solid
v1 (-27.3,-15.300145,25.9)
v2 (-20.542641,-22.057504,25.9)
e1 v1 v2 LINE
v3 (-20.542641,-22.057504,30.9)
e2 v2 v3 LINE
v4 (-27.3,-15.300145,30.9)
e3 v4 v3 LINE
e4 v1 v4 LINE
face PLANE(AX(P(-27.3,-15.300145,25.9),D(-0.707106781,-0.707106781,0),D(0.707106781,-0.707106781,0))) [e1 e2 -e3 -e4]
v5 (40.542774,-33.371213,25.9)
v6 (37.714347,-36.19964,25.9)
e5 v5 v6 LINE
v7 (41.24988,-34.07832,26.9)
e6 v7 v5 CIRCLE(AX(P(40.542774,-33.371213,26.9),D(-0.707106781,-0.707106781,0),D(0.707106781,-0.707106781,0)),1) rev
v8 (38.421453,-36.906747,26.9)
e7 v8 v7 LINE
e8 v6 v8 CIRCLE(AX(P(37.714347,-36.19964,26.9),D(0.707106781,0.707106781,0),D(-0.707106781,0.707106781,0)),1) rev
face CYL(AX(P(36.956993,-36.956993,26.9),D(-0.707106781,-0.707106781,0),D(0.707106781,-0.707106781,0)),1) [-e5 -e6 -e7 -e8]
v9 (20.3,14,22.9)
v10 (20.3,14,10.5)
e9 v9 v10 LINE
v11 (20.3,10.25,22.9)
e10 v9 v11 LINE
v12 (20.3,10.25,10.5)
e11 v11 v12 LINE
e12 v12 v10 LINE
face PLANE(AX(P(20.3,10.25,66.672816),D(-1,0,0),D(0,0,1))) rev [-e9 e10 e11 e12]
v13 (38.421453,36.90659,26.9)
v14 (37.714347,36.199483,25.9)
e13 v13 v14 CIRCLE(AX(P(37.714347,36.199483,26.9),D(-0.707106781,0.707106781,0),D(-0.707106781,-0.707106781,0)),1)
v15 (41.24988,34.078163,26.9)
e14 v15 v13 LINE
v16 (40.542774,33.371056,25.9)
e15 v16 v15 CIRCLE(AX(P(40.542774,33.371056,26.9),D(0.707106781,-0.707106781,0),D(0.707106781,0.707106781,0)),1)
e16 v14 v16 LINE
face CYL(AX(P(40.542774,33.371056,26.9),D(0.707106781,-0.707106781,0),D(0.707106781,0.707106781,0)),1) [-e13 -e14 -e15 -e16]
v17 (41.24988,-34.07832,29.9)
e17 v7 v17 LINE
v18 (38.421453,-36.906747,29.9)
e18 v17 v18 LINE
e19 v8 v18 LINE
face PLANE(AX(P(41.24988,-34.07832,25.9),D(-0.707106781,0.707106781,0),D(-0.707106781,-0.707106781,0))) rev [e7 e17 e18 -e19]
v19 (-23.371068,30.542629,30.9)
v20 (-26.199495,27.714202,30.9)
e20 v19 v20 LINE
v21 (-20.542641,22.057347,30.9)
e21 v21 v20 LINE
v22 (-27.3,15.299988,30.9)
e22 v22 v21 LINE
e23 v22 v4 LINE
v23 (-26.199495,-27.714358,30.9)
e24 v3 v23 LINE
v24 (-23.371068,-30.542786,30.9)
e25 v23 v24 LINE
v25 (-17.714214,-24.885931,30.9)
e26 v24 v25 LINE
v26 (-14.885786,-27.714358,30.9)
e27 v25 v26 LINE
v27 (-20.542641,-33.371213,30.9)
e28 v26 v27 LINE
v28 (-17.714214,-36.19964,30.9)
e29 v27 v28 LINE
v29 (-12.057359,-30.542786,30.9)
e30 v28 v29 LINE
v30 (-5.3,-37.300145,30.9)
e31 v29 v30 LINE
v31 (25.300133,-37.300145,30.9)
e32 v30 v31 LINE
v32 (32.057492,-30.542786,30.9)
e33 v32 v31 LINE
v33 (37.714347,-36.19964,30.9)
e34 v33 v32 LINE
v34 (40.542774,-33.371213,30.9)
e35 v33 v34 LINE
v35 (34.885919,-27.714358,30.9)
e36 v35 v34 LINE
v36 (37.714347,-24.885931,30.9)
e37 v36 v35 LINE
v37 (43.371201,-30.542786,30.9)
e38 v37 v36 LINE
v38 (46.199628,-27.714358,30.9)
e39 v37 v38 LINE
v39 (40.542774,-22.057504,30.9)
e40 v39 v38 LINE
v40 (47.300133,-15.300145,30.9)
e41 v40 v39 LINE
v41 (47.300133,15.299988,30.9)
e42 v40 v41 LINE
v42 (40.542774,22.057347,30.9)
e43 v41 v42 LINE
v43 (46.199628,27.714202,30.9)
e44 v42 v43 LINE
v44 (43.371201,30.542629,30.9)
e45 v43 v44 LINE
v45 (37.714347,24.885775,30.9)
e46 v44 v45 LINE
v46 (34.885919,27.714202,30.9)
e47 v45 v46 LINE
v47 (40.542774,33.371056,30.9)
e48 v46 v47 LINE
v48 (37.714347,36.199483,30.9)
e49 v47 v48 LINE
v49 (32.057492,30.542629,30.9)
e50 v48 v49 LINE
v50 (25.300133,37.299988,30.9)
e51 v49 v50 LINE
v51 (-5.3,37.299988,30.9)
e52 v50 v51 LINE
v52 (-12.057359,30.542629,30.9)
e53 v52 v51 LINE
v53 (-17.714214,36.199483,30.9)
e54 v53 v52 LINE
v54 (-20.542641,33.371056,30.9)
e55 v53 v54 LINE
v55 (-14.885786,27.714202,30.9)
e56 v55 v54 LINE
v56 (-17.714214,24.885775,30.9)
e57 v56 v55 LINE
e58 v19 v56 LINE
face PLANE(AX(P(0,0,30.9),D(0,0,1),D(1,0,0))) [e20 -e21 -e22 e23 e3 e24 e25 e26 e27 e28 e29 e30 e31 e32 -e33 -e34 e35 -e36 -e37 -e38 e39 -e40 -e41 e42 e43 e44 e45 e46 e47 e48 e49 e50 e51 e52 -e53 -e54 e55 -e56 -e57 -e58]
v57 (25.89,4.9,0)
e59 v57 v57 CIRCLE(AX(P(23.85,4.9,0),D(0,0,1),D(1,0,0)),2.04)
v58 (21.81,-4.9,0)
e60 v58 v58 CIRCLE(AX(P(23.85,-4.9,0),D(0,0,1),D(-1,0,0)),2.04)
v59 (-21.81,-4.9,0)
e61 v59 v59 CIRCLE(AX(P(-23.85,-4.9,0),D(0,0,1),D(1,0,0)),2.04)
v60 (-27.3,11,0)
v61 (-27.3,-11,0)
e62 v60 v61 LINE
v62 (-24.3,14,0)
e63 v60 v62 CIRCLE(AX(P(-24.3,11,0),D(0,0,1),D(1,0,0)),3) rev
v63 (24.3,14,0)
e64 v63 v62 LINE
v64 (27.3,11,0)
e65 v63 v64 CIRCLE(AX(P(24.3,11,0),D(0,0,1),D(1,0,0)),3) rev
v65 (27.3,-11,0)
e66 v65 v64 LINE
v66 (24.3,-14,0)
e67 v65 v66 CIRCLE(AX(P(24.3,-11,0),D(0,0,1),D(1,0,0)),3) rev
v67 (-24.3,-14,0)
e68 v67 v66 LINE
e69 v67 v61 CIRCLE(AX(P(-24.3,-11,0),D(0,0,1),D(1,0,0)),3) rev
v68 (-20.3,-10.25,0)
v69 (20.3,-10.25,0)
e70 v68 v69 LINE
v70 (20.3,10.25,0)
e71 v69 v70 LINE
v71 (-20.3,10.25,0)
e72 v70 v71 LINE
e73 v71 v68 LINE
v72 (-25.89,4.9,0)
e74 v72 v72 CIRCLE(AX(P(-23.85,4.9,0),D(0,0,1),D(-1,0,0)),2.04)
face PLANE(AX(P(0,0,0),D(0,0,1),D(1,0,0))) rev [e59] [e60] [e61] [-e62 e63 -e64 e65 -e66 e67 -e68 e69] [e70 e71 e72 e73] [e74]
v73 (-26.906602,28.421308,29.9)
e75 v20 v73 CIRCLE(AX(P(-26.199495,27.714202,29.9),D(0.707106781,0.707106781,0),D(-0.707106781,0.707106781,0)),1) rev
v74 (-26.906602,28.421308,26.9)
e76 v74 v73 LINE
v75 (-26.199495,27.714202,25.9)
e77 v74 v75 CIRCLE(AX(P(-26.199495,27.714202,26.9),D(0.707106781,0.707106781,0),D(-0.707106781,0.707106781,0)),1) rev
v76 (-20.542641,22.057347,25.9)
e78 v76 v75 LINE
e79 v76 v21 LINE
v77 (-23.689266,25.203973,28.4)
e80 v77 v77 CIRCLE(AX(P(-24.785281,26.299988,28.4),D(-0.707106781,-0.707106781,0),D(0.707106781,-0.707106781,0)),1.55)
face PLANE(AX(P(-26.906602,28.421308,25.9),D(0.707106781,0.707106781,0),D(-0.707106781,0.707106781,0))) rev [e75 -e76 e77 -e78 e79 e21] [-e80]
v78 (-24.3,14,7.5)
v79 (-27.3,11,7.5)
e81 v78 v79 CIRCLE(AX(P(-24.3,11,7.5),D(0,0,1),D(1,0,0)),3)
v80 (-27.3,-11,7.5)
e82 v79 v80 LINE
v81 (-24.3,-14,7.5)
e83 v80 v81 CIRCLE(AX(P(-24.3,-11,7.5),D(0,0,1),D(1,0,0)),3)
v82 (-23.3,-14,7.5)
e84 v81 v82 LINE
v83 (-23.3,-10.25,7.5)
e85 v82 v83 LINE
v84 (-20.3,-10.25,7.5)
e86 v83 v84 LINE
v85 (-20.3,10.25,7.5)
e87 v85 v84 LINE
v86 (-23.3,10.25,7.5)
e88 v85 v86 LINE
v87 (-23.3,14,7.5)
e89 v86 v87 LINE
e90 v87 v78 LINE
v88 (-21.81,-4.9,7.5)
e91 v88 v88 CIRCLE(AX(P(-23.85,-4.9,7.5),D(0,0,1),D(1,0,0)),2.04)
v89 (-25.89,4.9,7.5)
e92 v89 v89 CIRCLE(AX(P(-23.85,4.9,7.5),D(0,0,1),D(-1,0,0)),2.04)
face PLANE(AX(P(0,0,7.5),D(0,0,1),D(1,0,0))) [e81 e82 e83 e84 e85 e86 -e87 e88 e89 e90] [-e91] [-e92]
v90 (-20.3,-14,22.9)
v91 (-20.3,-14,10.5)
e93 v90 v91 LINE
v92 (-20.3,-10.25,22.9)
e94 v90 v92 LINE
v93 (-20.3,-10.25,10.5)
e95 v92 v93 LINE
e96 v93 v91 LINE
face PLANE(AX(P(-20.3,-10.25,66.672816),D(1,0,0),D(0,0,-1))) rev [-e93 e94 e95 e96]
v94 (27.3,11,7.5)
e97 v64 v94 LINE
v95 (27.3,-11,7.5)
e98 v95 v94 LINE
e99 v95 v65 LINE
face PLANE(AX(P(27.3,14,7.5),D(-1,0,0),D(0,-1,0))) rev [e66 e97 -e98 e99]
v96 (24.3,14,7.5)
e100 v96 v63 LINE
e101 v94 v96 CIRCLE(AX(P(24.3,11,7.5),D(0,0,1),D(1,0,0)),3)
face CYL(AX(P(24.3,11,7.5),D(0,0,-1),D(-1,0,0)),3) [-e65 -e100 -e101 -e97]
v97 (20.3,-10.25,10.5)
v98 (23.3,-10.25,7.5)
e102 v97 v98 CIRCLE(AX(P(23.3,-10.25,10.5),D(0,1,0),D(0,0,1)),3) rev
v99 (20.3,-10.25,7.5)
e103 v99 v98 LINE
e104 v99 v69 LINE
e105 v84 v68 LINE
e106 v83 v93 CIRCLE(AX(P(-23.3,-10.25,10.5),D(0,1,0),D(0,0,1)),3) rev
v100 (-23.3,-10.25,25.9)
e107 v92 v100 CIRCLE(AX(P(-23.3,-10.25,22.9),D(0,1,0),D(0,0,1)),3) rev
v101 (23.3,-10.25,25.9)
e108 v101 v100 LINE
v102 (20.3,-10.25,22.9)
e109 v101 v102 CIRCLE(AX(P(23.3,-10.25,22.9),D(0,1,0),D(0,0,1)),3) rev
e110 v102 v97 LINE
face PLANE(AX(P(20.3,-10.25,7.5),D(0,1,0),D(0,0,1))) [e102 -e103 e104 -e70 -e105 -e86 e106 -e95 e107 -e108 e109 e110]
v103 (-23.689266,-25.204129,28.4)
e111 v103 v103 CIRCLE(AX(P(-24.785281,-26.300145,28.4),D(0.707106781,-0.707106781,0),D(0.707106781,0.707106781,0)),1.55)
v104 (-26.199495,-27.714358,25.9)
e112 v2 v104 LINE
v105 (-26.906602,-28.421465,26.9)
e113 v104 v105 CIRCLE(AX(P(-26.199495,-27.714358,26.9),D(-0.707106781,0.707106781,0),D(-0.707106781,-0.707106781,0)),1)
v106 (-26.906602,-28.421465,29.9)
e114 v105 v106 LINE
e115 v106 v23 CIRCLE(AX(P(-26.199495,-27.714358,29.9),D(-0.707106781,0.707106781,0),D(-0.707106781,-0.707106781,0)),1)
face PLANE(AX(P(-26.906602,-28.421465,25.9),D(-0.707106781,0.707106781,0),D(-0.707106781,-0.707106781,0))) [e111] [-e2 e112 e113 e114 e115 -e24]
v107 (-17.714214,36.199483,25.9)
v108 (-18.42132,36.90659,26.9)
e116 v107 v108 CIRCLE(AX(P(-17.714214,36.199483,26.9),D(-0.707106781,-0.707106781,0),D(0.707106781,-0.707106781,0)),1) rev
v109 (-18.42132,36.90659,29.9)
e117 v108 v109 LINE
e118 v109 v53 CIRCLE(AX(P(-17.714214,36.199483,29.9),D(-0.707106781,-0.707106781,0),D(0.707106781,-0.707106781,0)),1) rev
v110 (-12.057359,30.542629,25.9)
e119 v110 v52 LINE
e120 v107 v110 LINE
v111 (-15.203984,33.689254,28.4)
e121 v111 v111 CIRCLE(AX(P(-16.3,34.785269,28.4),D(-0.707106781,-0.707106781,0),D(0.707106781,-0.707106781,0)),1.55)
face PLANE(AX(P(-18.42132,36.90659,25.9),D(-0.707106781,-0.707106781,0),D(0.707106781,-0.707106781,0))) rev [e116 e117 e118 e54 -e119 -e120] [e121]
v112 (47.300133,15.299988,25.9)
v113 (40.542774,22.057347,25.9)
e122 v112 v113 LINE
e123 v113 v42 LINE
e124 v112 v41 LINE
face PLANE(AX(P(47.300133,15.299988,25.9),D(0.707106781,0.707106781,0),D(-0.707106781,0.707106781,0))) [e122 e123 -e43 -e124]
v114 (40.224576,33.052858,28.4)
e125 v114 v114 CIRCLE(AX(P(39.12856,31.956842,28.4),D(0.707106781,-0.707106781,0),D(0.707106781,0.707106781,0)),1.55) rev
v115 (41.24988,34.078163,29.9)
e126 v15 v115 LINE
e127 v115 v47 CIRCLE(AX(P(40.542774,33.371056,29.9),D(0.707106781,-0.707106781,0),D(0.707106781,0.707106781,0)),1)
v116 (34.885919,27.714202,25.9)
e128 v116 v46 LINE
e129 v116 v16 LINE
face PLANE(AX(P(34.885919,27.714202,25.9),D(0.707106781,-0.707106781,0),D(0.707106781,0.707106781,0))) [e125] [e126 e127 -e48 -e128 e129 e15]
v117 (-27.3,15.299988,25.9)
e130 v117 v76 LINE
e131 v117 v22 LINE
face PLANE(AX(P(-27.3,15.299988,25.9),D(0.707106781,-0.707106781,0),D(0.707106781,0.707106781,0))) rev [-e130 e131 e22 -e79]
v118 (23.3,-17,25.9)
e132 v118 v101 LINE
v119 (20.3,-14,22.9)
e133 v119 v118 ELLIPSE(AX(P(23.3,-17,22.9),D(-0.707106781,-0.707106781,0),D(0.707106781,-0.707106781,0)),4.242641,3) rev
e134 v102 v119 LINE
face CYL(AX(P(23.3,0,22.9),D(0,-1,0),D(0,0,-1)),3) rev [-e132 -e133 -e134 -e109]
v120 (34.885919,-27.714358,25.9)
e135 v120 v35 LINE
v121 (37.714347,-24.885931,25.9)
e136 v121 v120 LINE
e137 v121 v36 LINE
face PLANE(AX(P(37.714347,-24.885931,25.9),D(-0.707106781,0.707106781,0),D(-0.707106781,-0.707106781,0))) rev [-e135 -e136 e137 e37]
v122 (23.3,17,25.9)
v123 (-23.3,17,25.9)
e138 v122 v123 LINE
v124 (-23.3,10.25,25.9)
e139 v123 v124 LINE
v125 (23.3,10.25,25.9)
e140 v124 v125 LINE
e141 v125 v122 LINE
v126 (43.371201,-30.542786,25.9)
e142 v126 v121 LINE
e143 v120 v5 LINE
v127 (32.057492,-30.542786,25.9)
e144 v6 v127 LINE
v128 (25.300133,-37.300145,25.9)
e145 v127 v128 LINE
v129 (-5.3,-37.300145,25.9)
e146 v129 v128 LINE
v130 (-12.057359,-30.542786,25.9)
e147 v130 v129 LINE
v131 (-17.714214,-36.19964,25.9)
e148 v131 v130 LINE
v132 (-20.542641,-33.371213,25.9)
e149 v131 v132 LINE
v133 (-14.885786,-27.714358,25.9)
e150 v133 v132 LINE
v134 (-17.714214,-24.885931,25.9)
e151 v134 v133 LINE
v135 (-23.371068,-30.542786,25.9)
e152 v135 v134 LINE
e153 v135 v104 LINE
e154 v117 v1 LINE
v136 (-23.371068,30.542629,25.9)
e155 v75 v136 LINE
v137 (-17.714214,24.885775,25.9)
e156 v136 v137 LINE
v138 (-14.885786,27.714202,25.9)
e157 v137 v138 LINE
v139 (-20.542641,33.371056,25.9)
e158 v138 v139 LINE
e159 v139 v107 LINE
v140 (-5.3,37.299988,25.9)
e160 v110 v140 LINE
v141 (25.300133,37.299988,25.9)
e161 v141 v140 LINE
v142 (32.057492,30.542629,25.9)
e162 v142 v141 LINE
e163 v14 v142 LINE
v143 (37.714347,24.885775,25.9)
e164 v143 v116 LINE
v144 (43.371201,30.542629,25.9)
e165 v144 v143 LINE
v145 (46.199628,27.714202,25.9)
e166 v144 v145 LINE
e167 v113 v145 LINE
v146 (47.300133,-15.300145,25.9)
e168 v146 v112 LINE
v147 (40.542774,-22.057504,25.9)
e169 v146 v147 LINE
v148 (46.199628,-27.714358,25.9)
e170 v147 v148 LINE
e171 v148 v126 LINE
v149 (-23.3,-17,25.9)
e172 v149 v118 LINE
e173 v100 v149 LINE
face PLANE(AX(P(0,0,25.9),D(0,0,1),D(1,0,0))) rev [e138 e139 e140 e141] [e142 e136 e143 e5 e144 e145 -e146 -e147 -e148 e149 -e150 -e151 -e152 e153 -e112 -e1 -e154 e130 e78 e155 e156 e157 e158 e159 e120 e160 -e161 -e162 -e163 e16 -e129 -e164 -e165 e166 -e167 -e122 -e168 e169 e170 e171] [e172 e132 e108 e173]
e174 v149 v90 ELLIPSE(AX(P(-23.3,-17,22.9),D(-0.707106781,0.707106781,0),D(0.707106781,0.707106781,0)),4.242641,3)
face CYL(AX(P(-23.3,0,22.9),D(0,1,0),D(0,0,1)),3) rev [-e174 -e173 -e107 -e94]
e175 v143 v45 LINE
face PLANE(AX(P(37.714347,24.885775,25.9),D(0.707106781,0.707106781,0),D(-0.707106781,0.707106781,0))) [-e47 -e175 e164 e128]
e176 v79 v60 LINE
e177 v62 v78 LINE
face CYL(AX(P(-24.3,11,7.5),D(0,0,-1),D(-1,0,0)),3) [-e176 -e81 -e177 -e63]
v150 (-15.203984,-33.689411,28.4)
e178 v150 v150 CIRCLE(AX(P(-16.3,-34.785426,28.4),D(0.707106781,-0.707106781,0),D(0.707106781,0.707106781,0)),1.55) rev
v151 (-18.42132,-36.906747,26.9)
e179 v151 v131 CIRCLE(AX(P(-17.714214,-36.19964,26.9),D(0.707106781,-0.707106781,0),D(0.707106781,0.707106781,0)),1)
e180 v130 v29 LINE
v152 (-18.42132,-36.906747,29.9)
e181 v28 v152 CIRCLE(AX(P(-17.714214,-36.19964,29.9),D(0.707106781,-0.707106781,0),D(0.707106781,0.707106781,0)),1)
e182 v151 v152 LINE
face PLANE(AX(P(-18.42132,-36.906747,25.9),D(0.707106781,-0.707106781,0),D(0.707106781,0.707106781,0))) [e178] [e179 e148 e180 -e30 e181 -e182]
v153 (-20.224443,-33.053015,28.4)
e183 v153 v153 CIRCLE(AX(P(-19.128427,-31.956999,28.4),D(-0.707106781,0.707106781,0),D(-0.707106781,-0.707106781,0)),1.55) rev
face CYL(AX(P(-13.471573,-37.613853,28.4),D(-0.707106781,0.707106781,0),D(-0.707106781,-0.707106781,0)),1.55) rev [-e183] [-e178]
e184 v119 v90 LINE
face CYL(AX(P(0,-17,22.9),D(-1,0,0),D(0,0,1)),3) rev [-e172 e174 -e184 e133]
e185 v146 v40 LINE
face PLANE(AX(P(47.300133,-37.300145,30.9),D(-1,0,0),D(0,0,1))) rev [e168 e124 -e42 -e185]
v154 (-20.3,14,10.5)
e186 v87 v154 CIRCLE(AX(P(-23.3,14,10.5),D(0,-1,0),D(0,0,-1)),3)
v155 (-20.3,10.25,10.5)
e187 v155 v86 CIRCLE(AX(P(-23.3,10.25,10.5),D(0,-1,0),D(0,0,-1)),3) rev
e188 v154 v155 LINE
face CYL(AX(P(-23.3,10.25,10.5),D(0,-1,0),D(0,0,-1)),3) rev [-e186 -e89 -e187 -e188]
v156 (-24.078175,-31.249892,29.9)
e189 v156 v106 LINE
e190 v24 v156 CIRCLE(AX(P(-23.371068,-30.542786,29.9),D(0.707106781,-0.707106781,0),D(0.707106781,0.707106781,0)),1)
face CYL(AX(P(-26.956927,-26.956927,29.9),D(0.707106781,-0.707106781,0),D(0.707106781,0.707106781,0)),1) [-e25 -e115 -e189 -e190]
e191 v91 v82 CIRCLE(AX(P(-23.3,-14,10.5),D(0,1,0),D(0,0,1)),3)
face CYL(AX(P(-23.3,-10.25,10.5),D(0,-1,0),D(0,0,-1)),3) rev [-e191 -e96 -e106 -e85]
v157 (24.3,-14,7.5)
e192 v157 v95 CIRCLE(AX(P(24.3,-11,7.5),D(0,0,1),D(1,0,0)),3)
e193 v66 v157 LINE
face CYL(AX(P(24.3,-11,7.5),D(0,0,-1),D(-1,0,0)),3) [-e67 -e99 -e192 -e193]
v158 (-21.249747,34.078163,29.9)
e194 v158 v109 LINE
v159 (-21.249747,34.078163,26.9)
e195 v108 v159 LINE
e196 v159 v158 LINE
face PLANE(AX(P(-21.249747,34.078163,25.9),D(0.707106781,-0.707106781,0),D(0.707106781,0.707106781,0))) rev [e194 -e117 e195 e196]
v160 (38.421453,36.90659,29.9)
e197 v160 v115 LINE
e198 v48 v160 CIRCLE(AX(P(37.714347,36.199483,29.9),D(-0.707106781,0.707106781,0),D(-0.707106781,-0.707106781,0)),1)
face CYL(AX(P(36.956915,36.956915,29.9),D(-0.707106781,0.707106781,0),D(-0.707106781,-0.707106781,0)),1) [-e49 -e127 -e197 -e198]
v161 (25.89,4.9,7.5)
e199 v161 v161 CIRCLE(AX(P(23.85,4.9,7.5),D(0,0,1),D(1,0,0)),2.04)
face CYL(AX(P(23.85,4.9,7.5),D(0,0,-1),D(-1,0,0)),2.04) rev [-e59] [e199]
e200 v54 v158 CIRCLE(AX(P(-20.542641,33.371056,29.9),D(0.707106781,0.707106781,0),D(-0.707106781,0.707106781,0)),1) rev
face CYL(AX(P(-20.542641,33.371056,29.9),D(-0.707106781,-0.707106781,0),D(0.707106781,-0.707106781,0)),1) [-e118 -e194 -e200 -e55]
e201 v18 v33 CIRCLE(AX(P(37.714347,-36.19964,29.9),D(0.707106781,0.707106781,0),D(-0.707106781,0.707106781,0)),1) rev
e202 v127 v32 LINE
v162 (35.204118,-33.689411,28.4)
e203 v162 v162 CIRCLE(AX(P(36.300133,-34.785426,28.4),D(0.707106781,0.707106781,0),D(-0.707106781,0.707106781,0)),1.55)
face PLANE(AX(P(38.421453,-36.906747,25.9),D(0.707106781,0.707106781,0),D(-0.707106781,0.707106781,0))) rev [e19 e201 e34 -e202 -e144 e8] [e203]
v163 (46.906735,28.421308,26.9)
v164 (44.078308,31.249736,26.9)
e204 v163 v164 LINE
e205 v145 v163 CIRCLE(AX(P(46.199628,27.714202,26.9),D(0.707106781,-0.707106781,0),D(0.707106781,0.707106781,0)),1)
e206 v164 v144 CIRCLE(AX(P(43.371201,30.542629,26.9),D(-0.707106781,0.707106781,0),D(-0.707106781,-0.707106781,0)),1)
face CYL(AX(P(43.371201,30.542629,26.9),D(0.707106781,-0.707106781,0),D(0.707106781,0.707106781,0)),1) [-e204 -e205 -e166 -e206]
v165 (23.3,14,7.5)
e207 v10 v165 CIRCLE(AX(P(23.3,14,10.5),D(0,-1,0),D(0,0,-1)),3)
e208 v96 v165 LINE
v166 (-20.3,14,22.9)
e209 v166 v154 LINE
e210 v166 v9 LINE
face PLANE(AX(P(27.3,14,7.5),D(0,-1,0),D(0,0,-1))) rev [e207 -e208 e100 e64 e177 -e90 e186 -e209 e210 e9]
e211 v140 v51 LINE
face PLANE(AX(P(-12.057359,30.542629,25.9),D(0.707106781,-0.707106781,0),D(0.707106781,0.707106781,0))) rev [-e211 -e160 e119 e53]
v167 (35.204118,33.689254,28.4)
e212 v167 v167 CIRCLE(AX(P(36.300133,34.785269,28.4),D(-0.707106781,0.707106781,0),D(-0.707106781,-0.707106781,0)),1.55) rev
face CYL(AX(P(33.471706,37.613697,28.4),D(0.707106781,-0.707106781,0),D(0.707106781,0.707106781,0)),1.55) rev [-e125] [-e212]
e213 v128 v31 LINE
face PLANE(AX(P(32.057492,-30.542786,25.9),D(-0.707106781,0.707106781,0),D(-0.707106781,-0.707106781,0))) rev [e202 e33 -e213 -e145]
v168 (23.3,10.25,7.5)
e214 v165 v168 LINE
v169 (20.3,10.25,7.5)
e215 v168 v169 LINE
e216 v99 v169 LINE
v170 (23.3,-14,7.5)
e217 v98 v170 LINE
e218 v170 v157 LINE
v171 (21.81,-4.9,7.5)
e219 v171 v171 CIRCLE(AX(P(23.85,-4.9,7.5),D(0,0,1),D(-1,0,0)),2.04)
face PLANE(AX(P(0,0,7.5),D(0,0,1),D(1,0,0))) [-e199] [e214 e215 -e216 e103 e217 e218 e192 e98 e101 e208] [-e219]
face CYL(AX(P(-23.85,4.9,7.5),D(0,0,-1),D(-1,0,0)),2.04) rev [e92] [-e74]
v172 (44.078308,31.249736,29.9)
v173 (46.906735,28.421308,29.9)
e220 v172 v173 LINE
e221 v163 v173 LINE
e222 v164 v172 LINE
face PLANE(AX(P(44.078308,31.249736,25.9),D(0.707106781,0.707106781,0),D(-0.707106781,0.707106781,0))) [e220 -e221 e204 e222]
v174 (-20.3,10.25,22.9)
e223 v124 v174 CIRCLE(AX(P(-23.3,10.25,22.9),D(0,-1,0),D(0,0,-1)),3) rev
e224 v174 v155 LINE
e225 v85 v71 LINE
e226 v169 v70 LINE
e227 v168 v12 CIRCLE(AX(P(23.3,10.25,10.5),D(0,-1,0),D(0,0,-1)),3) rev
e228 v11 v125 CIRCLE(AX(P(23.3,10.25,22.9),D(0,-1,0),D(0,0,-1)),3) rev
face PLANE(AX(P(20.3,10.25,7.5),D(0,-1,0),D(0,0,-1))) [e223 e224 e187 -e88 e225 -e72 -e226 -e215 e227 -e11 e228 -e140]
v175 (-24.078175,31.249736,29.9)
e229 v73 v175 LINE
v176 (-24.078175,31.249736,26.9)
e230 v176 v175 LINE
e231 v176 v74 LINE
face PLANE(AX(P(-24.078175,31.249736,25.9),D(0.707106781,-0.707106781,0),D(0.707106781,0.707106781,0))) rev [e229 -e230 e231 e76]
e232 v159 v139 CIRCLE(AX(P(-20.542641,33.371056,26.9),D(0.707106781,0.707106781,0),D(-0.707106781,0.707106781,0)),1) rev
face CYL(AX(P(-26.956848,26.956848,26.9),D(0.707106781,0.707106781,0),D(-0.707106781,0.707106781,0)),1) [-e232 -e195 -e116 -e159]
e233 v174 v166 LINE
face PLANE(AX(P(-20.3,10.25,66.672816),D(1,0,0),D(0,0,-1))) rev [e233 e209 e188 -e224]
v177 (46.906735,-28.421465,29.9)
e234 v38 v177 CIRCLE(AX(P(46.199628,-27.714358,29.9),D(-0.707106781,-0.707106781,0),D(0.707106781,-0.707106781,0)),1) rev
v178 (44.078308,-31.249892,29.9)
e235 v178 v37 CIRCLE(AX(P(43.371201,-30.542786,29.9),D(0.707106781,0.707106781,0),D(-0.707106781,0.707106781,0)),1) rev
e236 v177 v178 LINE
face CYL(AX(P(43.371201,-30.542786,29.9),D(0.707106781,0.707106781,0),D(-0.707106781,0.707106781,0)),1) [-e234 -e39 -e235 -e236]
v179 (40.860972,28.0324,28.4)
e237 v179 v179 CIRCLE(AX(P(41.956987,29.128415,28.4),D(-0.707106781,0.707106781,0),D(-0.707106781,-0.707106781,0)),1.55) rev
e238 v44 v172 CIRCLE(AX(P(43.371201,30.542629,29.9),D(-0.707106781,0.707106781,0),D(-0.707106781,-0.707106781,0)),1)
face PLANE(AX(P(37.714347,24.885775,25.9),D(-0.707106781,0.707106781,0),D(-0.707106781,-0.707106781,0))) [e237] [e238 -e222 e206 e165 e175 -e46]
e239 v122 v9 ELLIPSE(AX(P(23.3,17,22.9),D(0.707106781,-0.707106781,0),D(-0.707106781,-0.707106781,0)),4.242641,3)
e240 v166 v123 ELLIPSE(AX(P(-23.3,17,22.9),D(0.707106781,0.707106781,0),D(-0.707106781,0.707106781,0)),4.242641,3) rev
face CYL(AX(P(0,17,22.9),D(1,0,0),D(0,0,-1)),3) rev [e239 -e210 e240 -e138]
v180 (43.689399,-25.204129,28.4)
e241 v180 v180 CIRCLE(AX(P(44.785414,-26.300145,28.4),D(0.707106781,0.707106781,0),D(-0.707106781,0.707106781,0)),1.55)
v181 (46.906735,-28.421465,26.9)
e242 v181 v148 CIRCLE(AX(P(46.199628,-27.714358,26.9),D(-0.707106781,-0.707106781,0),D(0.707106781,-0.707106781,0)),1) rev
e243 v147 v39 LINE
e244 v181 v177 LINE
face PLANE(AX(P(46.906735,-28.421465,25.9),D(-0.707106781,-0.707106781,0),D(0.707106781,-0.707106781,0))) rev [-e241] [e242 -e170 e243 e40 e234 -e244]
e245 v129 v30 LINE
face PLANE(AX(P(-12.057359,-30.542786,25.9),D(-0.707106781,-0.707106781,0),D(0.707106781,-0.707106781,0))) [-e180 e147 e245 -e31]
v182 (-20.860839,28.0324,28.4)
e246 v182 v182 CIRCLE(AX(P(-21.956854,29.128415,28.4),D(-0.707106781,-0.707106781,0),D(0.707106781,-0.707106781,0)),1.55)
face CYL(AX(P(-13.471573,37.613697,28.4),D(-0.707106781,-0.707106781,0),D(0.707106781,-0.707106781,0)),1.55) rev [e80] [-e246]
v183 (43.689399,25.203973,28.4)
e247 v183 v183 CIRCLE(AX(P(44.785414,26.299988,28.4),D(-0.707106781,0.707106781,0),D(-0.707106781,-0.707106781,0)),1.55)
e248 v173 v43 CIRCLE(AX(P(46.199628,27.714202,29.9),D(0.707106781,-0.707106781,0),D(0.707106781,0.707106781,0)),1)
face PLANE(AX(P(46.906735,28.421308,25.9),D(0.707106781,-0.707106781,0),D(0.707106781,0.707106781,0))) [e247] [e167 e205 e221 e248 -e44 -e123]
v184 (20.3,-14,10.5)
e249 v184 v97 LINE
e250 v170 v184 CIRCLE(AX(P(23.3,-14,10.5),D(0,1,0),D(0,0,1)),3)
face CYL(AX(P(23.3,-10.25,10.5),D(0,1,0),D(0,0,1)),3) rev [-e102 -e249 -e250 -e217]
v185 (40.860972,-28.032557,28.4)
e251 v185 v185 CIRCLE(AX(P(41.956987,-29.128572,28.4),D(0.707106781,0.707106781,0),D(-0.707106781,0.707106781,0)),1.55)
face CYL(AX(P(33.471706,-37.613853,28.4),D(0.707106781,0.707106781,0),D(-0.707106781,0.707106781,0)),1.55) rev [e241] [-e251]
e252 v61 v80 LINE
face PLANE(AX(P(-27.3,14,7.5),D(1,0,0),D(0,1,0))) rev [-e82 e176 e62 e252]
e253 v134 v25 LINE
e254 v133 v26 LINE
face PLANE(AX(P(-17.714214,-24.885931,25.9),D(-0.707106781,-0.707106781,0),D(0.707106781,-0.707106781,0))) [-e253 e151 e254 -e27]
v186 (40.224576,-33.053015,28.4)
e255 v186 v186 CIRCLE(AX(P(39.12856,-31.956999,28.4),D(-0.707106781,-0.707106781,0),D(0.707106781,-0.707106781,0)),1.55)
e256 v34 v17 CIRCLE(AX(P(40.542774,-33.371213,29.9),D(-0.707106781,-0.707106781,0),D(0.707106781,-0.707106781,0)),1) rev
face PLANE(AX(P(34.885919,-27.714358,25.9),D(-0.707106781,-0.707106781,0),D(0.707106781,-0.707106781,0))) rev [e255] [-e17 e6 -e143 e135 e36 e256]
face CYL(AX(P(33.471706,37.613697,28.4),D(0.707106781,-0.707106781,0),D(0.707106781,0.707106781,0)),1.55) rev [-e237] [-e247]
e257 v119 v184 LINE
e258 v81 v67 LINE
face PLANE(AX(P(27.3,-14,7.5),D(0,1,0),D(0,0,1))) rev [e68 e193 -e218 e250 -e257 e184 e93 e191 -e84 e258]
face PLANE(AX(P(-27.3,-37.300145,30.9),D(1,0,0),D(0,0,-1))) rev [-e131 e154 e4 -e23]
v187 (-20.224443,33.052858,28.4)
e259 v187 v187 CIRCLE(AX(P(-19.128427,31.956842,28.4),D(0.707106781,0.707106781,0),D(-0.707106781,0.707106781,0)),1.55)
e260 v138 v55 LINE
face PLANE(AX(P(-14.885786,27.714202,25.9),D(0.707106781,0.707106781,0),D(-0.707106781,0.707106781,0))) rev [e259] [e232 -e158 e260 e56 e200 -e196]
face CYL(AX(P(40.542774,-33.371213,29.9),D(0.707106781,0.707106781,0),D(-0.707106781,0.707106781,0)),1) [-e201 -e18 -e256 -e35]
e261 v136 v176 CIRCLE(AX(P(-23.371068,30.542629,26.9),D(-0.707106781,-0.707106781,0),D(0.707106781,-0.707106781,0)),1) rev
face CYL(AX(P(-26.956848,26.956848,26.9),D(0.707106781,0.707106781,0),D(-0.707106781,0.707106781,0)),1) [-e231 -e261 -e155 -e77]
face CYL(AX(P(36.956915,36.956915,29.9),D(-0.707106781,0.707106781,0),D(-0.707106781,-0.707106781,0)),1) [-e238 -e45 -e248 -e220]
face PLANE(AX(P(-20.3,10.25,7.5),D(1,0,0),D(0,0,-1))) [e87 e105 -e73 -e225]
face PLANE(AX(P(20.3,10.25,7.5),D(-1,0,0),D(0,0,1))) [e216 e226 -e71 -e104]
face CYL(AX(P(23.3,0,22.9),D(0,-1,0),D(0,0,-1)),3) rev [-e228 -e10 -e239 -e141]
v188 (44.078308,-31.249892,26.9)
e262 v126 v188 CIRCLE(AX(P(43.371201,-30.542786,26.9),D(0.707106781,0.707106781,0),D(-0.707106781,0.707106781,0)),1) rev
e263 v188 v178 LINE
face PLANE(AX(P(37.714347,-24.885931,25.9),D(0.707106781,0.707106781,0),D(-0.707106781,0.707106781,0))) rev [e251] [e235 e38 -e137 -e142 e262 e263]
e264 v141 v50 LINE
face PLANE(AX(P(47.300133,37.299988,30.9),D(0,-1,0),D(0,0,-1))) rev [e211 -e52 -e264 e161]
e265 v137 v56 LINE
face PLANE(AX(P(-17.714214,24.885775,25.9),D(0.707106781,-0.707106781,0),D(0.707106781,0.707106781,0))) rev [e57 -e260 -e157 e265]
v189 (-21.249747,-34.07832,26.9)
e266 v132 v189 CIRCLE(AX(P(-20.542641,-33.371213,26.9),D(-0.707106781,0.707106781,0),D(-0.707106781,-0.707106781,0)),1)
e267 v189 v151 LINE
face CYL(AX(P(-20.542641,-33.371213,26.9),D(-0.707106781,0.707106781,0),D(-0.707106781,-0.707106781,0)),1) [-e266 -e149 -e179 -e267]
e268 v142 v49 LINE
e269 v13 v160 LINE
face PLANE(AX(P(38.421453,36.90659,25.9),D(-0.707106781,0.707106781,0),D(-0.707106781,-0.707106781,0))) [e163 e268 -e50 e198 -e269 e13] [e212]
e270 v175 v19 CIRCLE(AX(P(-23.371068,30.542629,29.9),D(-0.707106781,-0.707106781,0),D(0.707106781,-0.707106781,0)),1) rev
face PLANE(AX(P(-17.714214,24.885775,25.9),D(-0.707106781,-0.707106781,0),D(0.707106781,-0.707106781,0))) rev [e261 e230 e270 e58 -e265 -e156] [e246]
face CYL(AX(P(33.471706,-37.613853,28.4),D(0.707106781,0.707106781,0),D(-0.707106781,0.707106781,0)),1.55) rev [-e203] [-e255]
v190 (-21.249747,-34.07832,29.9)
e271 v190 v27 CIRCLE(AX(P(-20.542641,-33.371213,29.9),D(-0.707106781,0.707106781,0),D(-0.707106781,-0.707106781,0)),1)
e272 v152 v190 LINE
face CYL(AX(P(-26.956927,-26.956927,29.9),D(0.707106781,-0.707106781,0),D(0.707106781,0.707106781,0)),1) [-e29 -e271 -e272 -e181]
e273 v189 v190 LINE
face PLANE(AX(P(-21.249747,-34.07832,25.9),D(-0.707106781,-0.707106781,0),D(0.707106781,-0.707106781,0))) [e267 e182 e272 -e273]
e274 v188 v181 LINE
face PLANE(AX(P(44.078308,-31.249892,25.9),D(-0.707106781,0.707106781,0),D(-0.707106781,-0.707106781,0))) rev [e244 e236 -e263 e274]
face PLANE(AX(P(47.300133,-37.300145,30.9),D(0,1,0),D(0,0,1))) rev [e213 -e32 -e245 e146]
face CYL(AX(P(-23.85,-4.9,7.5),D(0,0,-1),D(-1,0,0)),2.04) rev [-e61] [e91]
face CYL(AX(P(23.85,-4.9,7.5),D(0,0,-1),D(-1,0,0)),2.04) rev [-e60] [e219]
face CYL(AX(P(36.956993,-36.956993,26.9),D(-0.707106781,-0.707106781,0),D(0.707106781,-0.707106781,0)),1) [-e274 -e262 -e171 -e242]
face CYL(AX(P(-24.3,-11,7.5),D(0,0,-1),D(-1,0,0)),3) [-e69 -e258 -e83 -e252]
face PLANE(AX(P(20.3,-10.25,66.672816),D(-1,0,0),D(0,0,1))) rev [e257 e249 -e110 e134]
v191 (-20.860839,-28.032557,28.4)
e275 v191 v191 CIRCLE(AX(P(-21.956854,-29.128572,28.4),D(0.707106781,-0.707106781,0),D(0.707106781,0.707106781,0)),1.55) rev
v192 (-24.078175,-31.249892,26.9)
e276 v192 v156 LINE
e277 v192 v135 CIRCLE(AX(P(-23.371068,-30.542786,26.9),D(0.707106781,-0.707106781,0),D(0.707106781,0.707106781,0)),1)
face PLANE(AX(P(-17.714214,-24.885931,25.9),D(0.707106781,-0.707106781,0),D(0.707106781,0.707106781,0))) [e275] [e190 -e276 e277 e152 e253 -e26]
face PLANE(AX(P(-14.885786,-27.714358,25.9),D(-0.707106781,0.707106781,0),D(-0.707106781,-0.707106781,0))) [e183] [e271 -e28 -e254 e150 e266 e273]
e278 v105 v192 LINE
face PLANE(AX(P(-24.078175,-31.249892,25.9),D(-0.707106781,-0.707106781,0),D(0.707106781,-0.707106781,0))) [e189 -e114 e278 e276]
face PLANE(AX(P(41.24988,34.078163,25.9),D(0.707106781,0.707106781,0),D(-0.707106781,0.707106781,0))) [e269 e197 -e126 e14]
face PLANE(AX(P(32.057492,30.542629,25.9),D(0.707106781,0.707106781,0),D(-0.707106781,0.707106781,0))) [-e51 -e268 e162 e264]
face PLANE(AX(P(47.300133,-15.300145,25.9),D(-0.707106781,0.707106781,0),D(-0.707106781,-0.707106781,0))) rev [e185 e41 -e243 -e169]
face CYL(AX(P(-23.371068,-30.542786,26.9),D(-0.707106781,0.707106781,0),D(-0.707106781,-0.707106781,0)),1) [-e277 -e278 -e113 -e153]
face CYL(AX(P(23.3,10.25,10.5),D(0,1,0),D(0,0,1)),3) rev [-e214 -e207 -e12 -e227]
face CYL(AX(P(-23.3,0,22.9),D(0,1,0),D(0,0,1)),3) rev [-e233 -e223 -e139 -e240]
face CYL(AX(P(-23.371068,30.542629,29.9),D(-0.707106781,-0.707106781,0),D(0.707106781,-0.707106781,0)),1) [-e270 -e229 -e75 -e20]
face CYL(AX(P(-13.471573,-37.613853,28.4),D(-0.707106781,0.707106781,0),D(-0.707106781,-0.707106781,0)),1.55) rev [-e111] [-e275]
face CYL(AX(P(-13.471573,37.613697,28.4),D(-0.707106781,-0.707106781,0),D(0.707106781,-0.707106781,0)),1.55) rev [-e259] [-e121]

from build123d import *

# Parameters (mm, degrees)
SKETCH2_W            = 54.6
SKETCH2_H            = 28
SKETCH2_R            = 2.04
SKETCH2_W_2          = 40.6
SKETCH2_H_2          = 20.5
BOSS_EXTRUDE1_DEPTH  = 7.5
SKETCH3_W            = 40.6
SKETCH3_H            = 3.75
BOSS_EXTRUDE2_DEPTH  = 18.4
SKETCH7_W            = 74.600133011
SKETCH7_H            = 74.600133011
BOSS_EXTRUDE4_DEPTH  = 5
CUT_EXTRUDE2_DEPTH   = 5
SKETCH9_R            = 1.55
CUT_EXTRUDE3_DEPTH   = 16
FILLET3_R            = 1
FILLET3_OF_MIRROR4_R = 1
FILLET4_R            = 3


# Read off the part's stored shape, not the designer's step: Mirror5
with BuildPart() as part:
    # Sketch2 → Boss-Extrude1 (new body)
    with BuildSketch(Plane.XY):
        Rectangle(SKETCH2_W, SKETCH2_H)
        with Locations((23.85, 4.9)):
            Circle(SKETCH2_R, mode=Mode.SUBTRACT)
        with Locations(Location((23.85, -4.9, 0), (0, 0, 180))):
            Circle(SKETCH2_R, mode=Mode.SUBTRACT)
        with Locations((-23.85, -4.9)):
            Circle(SKETCH2_R, mode=Mode.SUBTRACT)
        with Locations(Location((-23.85, 4.9, 0), (0, 0, 180))):
            Circle(SKETCH2_R, mode=Mode.SUBTRACT)
        Rectangle(SKETCH2_W_2, SKETCH2_H_2, mode=Mode.SUBTRACT)
    extrude(amount=BOSS_EXTRUDE1_DEPTH)

    # Sketch3 → Boss-Extrude2 (add)
    with BuildSketch(Plane.XY.offset(7.5)):
        with Locations((0, 12.125)):
            Rectangle(SKETCH3_W, SKETCH3_H)
        with Locations((0, -12.125)):
            Rectangle(SKETCH3_W, SKETCH3_H)
    extrude(amount=BOSS_EXTRUDE2_DEPTH)

    # Sketch7 → Boss-Extrude4 (add)
    with BuildSketch(Plane.XY.offset(25.9)):
        with Locations((10.000066505, -7.842e-05)):
            Rectangle(SKETCH7_W, SKETCH7_H)
    extrude(amount=BOSS_EXTRUDE4_DEPTH)

    # Sketch8 → Cut-Extrude2 (cut)
    with BuildSketch(Plane.XY.offset(30.9)):
        Polygon((-27.3, 15.299988086), (-20.542640687, 22.057347399), (-26.906601718, 28.421308429), (-24.078174593, 31.249735554), (-17.714213562, 24.885774524), (-14.885786438, 27.714201648), (-21.249747468, 34.078162679), (-18.421320344, 36.906589804), (-12.057359313, 30.542628773), (-5.3, 37.299988086), (-27.3, 37.299988086), align=None)
    cut_extrude2 = extrude(amount=-CUT_EXTRUDE2_DEPTH, mode=Mode.SUBTRACT)

    # Sketch9 → Cut-Extrude3 (cut)
    with BuildSketch(Plane(origin=(0.757353356, 0.757353356, 0), x_dir=(0, 0, 1), z_dir=(-0.7071067811865474, -0.7071067811865477, 0))):
        with Locations(Location((28.4, 36.122740454, 0), (0, 0, 270))):
            Circle(SKETCH9_R)
    cut_extrude3 = extrude(amount=-CUT_EXTRUDE3_DEPTH, mode=Mode.SUBTRACT)

    # Fillet3
    fillet3_edges = [part.edges().sort_by_distance(p)[0] for p in [
        (-25.492388155, 29.835521992, 30.9),
        (-19.835533906, 35.492376241, 30.9),
        (-19.835533906, 35.492376241, 25.9),
        (-25.492388155, 29.835521992, 25.9),
    ]]
    fillet(fillet3_edges, radius=FILLET3_R)

    # Mirror4: Cut-Extrude2, Cut-Extrude3 across plane
    add(cut_extrude2.mirror(Plane.ZY.offset(-10.000066506)), mode=Mode.SUBTRACT)
    add(cut_extrude3.mirror(Plane.ZY.offset(-10.000066506)), mode=Mode.SUBTRACT)

    # Fillet3 of Mirror4
    fillet3_of_mirror4_edges = [part.edges().sort_by_distance(p)[0] for p in [
        (45.492521167, 29.835521992, 30.9),
        (39.835666917, 35.492376241, 30.9),
        (39.835666917, 35.492376241, 25.9),
        (45.492521167, 29.835521992, 25.9),
    ]]
    fillet(fillet3_of_mirror4_edges, radius=FILLET3_OF_MIRROR4_R)

    # Mirror5
    split(bisect_by=Plane.ZX.offset(-7.842e-05), keep=Keep.TOP)

    # Mirror5 2: part across plane


with BuildPart() as part_1:
    add(part.part)
    add(part.part.mirror(Plane.ZX.offset(-7.842e-05)))

    # Fillet4
    fillet4_edges = [part_1.edges().sort_by_distance(p)[0] for p in [
        (-20.3, 12.125, 7.5),
        (20.3, 12.125, 7.5),
        (0, 14, 25.9),
        (-20.3, 12.125, 25.9),
        (20.3, 12.125, 25.9),
        (-20.3, -12.125156839, 7.5),
        (20.3, -12.125156839, 7.5),
        (-20.3, -12.125156839, 25.9),
        (0, -14.000156839, 25.9),
        (20.3, -12.125156839, 25.9),
        (-27.3, -14.000156839, 3.75),
        (-27.3, 14, 3.75),
        (27.3, 14, 3.75),
        (27.3, -14.000156839, 3.75),
    ]]
    fillet(fillet4_edges, radius=FILLET4_R)


solid = part_1.part
